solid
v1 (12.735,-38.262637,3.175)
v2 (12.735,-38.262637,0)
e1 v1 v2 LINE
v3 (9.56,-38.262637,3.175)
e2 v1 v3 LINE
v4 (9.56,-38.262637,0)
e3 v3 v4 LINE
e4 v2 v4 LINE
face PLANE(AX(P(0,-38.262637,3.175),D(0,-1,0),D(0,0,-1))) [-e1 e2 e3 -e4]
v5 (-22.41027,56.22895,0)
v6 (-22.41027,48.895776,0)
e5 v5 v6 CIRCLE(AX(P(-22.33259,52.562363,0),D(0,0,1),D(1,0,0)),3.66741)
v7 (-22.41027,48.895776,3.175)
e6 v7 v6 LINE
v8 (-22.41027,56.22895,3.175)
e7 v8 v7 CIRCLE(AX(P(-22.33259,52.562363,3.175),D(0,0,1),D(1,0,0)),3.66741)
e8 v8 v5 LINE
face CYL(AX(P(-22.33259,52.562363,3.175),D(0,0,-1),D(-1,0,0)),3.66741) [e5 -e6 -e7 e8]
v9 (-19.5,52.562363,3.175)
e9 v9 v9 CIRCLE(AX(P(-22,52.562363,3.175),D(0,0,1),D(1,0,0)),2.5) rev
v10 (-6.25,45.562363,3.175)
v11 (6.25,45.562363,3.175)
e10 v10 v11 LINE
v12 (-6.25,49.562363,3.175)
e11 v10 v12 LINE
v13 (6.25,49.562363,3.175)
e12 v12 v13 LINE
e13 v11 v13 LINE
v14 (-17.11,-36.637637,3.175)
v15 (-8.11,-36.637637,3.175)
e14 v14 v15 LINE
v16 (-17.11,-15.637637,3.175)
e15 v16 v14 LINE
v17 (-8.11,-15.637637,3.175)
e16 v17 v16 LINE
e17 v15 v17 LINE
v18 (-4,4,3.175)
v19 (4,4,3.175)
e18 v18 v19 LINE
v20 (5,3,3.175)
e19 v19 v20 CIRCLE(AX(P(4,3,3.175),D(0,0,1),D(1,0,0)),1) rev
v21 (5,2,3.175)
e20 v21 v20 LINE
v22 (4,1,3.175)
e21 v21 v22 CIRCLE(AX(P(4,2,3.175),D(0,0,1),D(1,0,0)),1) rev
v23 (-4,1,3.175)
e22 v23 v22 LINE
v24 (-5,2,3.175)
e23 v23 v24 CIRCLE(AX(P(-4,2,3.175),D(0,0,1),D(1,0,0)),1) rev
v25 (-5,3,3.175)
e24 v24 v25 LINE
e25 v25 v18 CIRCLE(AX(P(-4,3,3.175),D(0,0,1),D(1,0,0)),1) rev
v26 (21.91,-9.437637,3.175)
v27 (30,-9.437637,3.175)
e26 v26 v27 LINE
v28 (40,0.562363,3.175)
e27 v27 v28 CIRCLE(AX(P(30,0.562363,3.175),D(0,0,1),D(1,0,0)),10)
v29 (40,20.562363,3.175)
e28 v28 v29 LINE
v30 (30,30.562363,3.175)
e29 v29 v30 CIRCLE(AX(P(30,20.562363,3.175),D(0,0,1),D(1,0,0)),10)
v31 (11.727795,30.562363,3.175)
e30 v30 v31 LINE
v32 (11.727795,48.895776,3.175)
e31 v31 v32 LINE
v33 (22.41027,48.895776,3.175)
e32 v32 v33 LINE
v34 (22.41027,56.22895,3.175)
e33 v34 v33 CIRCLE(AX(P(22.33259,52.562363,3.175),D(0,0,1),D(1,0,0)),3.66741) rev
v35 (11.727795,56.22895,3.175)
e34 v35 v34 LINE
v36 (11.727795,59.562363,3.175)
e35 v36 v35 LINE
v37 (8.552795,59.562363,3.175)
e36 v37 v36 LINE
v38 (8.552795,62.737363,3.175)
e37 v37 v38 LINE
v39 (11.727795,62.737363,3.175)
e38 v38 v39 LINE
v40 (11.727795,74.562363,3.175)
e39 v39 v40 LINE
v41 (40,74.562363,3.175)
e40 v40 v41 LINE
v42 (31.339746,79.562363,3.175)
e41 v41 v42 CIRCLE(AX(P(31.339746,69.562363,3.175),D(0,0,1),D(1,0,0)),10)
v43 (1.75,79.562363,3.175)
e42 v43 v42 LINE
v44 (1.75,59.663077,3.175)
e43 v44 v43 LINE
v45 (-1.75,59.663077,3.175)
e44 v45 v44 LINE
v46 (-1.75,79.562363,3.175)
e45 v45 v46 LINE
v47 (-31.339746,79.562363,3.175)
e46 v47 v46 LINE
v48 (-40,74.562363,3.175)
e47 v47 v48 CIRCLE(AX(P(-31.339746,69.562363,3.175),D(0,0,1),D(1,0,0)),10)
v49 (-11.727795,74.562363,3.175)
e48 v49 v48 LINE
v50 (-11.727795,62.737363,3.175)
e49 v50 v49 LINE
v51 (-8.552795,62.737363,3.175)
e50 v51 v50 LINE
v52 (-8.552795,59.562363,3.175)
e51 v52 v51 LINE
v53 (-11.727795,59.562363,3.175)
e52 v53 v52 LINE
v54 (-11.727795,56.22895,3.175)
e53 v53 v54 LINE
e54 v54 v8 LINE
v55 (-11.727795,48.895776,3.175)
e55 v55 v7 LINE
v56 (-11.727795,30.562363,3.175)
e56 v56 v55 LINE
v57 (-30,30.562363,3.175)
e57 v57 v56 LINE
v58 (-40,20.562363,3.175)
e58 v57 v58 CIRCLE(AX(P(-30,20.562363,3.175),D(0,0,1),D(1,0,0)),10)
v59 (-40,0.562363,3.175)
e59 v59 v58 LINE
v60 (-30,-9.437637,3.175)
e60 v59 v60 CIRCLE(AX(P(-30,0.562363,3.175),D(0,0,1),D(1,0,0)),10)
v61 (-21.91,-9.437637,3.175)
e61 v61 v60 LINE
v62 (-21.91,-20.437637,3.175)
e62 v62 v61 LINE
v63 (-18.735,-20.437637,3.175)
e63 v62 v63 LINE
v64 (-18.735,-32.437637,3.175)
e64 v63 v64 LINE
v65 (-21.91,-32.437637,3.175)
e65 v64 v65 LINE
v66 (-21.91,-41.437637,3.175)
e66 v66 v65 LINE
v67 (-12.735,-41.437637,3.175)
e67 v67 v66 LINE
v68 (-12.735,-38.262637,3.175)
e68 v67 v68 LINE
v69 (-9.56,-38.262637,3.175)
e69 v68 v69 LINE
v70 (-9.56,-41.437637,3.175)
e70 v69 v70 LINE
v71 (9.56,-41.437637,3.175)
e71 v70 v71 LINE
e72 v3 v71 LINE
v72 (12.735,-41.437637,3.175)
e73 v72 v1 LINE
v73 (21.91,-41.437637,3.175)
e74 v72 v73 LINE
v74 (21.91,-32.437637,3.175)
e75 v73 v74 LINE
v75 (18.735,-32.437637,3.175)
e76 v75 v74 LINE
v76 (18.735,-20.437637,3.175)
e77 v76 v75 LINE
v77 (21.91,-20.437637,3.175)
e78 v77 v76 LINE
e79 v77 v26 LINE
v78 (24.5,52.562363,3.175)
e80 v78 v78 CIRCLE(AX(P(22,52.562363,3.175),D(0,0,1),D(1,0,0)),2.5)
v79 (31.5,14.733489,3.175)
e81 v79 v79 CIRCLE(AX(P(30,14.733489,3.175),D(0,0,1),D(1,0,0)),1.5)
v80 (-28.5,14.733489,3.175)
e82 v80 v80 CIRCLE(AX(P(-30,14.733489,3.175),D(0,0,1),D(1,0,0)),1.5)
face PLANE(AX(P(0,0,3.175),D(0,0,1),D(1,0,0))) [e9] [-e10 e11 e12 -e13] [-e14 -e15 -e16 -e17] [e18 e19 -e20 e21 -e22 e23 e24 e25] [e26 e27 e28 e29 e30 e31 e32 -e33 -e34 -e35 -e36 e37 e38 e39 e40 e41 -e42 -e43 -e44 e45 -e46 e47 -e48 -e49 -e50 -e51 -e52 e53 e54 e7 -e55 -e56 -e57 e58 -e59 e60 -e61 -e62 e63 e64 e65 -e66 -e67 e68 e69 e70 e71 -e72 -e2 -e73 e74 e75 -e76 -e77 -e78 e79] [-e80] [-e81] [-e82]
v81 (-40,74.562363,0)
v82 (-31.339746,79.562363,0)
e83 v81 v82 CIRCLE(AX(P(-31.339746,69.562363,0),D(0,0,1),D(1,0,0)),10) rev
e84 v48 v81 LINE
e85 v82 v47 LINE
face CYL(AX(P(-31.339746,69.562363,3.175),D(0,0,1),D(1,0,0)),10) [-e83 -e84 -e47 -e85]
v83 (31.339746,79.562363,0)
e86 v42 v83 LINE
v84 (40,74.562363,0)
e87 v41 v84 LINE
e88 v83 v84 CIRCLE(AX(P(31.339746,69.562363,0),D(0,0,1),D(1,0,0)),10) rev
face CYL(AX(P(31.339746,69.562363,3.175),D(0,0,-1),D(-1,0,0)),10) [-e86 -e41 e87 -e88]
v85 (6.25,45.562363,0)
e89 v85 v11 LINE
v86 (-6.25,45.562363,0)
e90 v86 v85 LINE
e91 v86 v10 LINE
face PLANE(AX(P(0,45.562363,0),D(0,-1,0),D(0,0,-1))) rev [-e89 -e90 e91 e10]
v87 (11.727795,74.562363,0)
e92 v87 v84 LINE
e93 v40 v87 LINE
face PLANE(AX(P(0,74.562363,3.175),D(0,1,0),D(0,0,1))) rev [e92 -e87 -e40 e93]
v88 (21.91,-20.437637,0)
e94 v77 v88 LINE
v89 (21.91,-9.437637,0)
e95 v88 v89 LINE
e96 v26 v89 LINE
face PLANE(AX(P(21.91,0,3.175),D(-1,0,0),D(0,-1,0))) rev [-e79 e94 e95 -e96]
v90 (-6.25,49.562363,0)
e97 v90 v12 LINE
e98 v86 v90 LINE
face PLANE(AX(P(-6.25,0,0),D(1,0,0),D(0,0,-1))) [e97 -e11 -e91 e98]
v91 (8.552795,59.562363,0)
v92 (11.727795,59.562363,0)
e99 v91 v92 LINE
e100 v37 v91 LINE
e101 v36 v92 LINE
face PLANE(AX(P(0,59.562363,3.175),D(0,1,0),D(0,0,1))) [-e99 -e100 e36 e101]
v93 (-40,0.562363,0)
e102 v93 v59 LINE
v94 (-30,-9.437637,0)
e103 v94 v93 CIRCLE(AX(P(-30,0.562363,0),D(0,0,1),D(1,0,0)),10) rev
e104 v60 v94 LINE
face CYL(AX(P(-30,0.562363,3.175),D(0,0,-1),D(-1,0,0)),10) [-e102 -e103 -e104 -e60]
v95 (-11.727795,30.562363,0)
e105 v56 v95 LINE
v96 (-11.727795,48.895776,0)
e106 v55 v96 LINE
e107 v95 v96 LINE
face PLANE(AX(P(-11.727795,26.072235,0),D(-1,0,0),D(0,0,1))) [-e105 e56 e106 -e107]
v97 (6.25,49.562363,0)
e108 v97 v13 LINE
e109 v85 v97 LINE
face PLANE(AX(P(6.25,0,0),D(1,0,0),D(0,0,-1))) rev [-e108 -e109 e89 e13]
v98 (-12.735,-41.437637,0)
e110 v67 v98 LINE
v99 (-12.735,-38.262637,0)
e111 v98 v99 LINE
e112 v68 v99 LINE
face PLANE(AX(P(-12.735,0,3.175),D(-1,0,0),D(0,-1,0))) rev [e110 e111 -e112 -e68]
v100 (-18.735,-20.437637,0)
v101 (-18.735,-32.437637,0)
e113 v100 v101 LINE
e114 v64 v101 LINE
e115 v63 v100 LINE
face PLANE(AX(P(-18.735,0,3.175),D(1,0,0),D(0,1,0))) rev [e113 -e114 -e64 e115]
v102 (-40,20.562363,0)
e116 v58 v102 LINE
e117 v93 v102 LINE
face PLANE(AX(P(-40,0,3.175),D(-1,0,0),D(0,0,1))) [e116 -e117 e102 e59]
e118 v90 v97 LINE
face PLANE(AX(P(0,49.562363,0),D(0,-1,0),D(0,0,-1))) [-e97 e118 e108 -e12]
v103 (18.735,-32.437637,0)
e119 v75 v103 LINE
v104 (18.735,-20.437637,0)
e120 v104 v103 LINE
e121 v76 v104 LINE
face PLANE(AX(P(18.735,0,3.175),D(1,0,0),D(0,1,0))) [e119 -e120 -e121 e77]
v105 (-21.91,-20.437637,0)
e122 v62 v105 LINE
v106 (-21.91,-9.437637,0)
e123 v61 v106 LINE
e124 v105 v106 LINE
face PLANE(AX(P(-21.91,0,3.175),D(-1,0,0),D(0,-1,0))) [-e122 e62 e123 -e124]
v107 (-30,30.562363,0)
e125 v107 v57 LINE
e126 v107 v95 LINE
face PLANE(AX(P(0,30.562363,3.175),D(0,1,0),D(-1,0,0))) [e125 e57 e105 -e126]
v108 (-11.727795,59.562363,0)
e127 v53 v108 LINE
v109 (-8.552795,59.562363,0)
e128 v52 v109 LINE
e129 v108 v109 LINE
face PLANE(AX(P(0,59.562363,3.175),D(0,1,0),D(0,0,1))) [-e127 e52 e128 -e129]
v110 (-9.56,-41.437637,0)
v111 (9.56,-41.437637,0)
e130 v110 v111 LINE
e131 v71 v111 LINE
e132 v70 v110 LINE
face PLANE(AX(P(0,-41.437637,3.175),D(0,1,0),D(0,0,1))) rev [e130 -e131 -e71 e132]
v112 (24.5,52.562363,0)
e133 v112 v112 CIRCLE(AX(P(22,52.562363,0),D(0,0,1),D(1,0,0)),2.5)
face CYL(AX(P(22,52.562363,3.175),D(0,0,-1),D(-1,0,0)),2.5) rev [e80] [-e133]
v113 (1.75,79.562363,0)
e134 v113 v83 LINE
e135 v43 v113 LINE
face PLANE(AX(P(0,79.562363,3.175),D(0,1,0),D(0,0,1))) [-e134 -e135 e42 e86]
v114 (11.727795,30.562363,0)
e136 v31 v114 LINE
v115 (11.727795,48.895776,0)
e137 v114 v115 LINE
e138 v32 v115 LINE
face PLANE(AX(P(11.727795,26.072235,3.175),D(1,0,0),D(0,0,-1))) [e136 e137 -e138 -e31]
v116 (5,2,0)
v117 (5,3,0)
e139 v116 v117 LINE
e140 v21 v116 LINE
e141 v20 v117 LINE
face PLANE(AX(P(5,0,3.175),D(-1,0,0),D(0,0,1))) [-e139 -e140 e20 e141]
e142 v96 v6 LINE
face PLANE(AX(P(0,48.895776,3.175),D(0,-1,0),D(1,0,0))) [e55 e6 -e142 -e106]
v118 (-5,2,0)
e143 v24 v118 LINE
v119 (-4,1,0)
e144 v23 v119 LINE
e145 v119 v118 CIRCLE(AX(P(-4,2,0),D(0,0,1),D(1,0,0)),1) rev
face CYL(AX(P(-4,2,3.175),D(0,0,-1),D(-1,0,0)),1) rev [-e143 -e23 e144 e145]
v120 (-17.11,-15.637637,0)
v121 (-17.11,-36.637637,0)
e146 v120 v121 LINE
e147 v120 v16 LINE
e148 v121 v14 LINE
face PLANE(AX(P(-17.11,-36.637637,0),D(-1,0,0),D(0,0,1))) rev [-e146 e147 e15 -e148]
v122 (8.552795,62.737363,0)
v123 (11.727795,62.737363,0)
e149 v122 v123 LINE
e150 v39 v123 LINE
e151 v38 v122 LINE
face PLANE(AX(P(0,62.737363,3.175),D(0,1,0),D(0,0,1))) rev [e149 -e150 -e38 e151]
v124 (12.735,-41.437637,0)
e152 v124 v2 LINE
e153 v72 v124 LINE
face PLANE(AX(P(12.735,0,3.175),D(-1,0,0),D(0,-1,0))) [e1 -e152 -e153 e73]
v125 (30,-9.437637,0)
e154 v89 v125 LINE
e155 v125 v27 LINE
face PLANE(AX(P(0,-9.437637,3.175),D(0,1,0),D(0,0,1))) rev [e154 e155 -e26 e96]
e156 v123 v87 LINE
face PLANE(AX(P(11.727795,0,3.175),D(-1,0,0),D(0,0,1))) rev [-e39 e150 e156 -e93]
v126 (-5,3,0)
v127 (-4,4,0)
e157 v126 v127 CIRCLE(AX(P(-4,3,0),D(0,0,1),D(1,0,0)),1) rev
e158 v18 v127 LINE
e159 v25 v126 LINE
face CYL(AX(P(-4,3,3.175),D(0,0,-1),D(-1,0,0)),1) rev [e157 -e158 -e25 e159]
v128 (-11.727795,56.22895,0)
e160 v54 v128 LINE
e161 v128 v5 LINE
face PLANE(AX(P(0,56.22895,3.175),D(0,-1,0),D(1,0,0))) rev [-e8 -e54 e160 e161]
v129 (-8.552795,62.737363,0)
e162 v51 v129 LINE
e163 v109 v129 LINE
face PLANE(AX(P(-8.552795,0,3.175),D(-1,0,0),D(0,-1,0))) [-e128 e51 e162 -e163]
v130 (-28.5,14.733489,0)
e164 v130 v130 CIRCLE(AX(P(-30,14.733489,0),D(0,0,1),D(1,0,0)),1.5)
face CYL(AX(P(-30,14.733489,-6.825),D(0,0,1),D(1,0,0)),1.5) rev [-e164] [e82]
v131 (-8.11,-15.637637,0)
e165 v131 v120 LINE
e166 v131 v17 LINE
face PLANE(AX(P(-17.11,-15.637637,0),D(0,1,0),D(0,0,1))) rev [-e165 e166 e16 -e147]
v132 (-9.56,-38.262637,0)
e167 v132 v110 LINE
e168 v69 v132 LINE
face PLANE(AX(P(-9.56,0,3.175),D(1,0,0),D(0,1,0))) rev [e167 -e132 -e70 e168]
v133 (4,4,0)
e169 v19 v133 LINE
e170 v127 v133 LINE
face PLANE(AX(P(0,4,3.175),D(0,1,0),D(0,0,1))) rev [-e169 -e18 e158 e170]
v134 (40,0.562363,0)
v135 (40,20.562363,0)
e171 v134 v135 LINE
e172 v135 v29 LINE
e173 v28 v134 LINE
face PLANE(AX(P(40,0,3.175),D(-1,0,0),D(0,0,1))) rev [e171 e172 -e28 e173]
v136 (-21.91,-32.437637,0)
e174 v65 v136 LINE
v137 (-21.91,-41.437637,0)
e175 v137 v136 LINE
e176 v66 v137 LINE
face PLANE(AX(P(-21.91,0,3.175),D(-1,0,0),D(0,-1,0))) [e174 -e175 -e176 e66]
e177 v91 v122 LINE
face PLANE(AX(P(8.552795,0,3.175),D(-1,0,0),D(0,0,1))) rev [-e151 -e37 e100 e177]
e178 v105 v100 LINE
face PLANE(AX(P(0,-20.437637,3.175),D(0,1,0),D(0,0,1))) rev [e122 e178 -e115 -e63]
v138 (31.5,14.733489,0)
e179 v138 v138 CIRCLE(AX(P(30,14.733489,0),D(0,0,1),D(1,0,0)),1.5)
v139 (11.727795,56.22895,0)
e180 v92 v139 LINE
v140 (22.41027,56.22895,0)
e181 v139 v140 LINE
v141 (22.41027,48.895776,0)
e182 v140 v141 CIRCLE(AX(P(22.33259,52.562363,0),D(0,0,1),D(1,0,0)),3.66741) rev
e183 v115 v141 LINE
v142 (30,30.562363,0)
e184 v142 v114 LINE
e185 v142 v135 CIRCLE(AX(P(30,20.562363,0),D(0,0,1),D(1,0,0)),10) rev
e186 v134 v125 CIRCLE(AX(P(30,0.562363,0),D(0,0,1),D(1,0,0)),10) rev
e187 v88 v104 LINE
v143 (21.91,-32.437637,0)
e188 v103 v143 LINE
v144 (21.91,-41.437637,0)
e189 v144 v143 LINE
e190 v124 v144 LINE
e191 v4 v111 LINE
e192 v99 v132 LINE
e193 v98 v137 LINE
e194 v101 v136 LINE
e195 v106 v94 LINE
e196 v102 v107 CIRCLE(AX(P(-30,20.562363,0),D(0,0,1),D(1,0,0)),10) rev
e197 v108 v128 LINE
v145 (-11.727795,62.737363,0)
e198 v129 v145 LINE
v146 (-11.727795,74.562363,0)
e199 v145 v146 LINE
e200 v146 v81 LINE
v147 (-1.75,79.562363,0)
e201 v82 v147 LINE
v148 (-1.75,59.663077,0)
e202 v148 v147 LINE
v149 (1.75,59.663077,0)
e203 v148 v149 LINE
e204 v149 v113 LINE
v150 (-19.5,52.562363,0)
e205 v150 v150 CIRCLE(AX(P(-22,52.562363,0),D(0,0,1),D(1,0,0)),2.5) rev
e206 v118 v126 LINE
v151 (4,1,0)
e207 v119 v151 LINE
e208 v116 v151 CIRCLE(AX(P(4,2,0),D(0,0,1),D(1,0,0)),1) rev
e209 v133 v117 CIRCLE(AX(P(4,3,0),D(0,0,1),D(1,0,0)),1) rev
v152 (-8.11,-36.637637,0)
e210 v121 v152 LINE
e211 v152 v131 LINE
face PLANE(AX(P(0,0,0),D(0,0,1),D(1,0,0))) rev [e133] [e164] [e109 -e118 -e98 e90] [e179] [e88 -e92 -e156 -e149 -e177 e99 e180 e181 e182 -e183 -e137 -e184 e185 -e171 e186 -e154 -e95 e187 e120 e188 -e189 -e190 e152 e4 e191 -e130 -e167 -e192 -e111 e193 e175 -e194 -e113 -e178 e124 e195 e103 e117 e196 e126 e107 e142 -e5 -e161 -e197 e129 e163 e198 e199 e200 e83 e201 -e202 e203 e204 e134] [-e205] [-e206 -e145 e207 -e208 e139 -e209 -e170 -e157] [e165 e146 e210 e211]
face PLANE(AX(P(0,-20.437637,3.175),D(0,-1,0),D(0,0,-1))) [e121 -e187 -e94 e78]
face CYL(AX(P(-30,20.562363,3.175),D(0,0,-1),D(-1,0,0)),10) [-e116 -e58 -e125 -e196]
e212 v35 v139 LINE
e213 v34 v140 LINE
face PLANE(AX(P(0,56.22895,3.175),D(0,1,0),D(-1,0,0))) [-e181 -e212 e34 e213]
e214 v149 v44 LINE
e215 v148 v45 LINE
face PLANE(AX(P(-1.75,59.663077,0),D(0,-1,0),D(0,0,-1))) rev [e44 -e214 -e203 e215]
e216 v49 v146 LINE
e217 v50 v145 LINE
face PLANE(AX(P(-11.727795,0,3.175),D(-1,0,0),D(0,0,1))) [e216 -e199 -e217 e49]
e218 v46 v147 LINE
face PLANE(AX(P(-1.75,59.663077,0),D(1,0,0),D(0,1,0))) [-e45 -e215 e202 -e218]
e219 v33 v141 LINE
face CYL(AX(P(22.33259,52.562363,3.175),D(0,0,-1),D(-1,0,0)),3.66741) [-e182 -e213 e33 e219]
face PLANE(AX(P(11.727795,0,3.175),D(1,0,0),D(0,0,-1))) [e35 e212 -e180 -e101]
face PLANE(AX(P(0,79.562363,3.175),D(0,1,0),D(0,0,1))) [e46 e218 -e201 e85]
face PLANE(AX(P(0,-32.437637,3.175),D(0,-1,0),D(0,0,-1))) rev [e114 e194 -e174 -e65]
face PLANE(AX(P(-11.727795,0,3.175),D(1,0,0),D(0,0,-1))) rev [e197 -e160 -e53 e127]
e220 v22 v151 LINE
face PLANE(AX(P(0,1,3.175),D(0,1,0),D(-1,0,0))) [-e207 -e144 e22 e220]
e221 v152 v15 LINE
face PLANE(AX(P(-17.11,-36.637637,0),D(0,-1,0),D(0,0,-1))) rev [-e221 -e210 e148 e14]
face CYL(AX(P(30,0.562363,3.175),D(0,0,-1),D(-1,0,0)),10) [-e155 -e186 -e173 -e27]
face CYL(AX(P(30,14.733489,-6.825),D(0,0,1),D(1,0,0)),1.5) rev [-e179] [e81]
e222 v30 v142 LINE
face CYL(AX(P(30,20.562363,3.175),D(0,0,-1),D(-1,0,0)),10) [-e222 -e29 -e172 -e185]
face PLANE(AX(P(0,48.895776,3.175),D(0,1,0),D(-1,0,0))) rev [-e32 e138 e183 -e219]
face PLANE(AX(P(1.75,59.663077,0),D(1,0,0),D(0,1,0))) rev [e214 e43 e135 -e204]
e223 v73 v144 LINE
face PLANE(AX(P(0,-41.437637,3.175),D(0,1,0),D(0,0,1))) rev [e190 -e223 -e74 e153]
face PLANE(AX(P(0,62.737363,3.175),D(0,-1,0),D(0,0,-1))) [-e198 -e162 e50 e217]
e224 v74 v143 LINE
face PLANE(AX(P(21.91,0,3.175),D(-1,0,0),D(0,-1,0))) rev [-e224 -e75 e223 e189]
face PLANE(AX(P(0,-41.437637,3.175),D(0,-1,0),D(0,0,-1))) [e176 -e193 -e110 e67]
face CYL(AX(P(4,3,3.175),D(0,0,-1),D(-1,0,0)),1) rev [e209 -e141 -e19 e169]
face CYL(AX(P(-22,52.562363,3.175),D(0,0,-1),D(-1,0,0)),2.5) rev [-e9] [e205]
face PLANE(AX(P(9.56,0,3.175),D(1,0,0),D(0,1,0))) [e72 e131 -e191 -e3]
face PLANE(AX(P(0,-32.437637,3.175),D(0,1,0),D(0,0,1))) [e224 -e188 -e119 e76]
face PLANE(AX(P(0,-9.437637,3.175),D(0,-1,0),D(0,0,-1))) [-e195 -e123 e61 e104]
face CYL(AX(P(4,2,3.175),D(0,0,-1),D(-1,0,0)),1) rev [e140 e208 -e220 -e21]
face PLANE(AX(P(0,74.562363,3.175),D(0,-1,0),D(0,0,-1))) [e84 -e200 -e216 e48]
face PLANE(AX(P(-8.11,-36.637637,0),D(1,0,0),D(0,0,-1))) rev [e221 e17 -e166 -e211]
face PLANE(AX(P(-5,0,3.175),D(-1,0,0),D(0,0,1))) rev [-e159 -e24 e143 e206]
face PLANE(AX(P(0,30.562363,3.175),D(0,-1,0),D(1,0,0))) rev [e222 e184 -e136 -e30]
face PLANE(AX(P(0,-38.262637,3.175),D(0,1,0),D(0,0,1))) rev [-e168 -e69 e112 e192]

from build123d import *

# Parameters (mm, degrees)
SKETCH1_R           = 2.5
BOSS_EXTRUDE1_DEPTH = 3.175
FILLET1_R           = 10
SKETCH2_W           = 9
SKETCH2_H           = 21
CUT_EXTRUDE1_DEPTH  = 90.108082017
SKETCH3_W           = 12.5
SKETCH3_H           = 4
SKETCH3_W_2         = 3.5
SKETCH3_H_2         = 20
CUT_EXTRUDE2_DEPTH  = 90.108082017
FILLET2_R           = 10
SKETCH4_W           = 3.175
SKETCH4_H           = 3.175
BOSS_EXTRUDE2_DEPTH = 29
SKETCH5_W           = 3.175
SKETCH5_H           = 3.175
BOSS_EXTRUDE3_DEPTH = 29
SKETCH7_R           = 1.5
CUT_EXTRUDE3_DEPTH  = 10


with BuildPart() as part:
    # Sketch1 → Boss-Extrude1 (new body)
    with BuildSketch(Plane.XY):
        with BuildLine():
            Line((-9.56, -38.262636689), (-9.56, -41.437636689))
            Line((-9.56, -41.437636689), (9.56, -41.437636689))
            Line((9.56, -41.437636689), (9.56, -38.262636689))
            Line((9.56, -38.262636689), (12.735, -38.262636689))
            Line((12.735, -38.262636689), (12.735, -41.437636689))
            Line((12.735, -41.437636689), (15.91, -41.437636689))
            Line((15.91, -41.437636689), (21.91, -41.437636689))
            Line((21.91, -41.437636689), (21.91, -32.437636689))
            Line((21.91, -32.437636689), (18.735, -32.437636689))
            Line((18.735, -32.437636689), (18.735, -20.437636689))
            Line((18.735, -20.437636689), (21.91, -20.437636689))
            Line((21.91, -20.437636689), (21.91, -9.437636689))
            Line((21.91, -9.437636689), (40, -9.437636689))
            Line((40, -9.437636689), (40, 30.562363311))
            Line((40, 30.562363311), (10, 30.562363311))
            Line((10, 30.562363311), (10, 45.562363311))
            Line((10, 45.562363311), (10, 48.89577614))
            Line((10, 48.89577614), (22.410269523, 48.89577614))
            ThreePointArc((22.410269523, 48.89577614), (26.000000001, 52.562363311), (22.410269523, 56.228950483))
            Line((22.410269523, 56.228950483), (11.727794547, 56.228950483))
            Line((11.727794547, 56.228950483), (11.727794547, 59.562363311))
            Line((11.727794547, 59.562363311), (10, 59.562363311))
            Line((10, 59.562363311), (8.552794547, 59.562363311))
            Line((8.552794547, 59.562363311), (8.552794547, 62.737363311))
            Line((8.552794547, 62.737363311), (11.727794547, 62.737363311))
            Line((11.727794547, 62.737363311), (11.727794547, 74.562363311))
            Line((11.727794547, 74.562363311), (40, 74.562363311))
            Line((40, 74.562363311), (40, 79.562363311))
            Line((40, 79.562363311), (0, 79.562363311))
            Line((0, 79.562363311), (-40, 79.562363311))
            Line((-40, 79.562363311), (-40, 74.562363311))
            Line((-40, 74.562363311), (-11.727794547, 74.562363311))
            Line((-11.727794547, 74.562363311), (-11.727794547, 62.737363311))
            Line((-11.727794547, 62.737363311), (-8.552794547, 62.737363311))
            Line((-8.552794547, 62.737363311), (-8.552794547, 59.562363311))
            Line((-8.552794547, 59.562363311), (-10, 59.562363311))
            Line((-10, 59.562363311), (-11.727794547, 59.562363311))
            Line((-11.727794547, 59.562363311), (-11.727794547, 56.228950483))
            Line((-11.727794547, 56.228950483), (-22.410269523, 56.228950483))
            ThreePointArc((-22.410269523, 56.228950483), (-26.000000001, 52.562363311), (-22.410269523, 48.89577614))
            Line((-22.410269523, 48.89577614), (-10, 48.89577614))
            Line((-10, 48.89577614), (-10, 45.562363311))
            Line((-10, 45.562363311), (-10, 30.562363311))
            Line((-10, 30.562363311), (-40, 30.562363311))
            Line((-40, 30.562363311), (-40, -9.437636689))
            Line((-40, -9.437636689), (-21.91, -9.437636689))
            Line((-21.91, -9.437636689), (-21.91, -20.437636689))
            Line((-21.91, -20.437636689), (-18.735, -20.437636689))
            Line((-18.735, -20.437636689), (-18.735, -32.437636689))
            Line((-18.735, -32.437636689), (-21.91, -32.437636689))
            Line((-21.91, -32.437636689), (-21.91, -41.437636689))
            Line((-21.91, -41.437636689), (-15.91, -41.437636689))
            Line((-15.91, -41.437636689), (-12.735, -41.437636689))
            Line((-12.735, -41.437636689), (-12.735, -38.262636689))
            Line((-12.735, -38.262636689), (-9.56, -38.262636689))
        make_face()
        with BuildLine():
            Line((4, 1), (-4, 1))
            ThreePointArc((-4, 1), (-4.707106781, 1.292893219), (-5, 2))
            Line((-5, 2), (-5, 3))
            ThreePointArc((-5, 3), (-4.707106781, 3.707106781), (-4, 4))
            Line((-4, 4), (4, 4))
            ThreePointArc((4, 4), (4.707106781, 3.707106781), (5, 3))
            Line((5, 3), (5, 2))
            ThreePointArc((5, 2), (4.707106781, 1.292893219), (4, 1))
        make_face(mode=Mode.SUBTRACT)
        with Locations((-22, 52.562363311)):
            Circle(SKETCH1_R, mode=Mode.SUBTRACT)
        with Locations((22, 52.562363311)):
            Circle(SKETCH1_R, mode=Mode.SUBTRACT)
    extrude(amount=BOSS_EXTRUDE1_DEPTH)

    # Fillet1
    # the kernel refuses this fillet: 10 mm, written as the material it takes off along each edge
    with BuildSketch(Plane(origin=(-40, 79.562363311, -21.650635095), x_dir=(0, -1, 0), z_dir=(0, 0, 1))) as fillet1_piece_1:
        with BuildLine():
            CenterArc((10, 8.660254038), FILLET1_R, 180, 60)
            Line((0, 8.660254038), (-0.2, 8.660254038))
            Line((-0.2, 8.660254038), (-0.2, 0))
            Line((-0.2, 0), (0, -0.2))
            ThreePointArc((0, -0.2), (2.5, -0.2), (4.9, -0.173205081))
            Line((4.9, -0.173205081), (5, 0))
        make_face()
    extrude(amount=46.476270189, mode=Mode.SUBTRACT)
    with BuildSketch(Plane(origin=(40, 79.562363311, -21.650635095), x_dir=(-1, 0, 0), z_dir=(0, 0, 1))) as fillet1_piece_2:
        with BuildLine():
            CenterArc((8.660254038, 10), FILLET1_R, 210, 60)
            Line((0, 5), (-0.173205081, 4.9))
            ThreePointArc((-0.173205081, 4.9), (-0.2, 2.5), (-0.2, 0))
            Line((-0.2, 0), (0, -0.2))
            Line((0, -0.2), (8.660254038, -0.2))
            Line((8.660254038, -0.2), (8.660254038, 0))
        make_face()
    extrude(amount=46.476270189, mode=Mode.SUBTRACT)

    # Sketch2 → Cut-Extrude1 (cut, through all)
    with BuildSketch(Plane.XY.offset(3.175)):
        with Locations((-12.61, -26.137636689)):
            Rectangle(SKETCH2_W, SKETCH2_H)
    extrude(amount=-CUT_EXTRUDE1_DEPTH, mode=Mode.SUBTRACT)

    # Sketch3 → Cut-Extrude2 (cut, through all)
    with BuildSketch(Plane.XY.offset(3.175)):
        with Locations((0, 47.562363311)):
            Rectangle(SKETCH3_W, SKETCH3_H)
        with Locations((0, 69.663077344)):
            Rectangle(SKETCH3_W_2, SKETCH3_H_2)
    extrude(amount=-CUT_EXTRUDE2_DEPTH, mode=Mode.SUBTRACT)

    # Fillet2
    fillet2_edges = [part.edges().sort_by_distance(p)[0] for p in [
        (40, 30.562363311, 1.5875),
        (40, -9.437636689, 1.5875),
        (-40, -9.437636689, 1.5875),
        (-40, 30.562363311, 1.5875),
    ]]
    fillet(fillet2_edges, radius=FILLET2_R)

    # Sketch4 → Boss-Extrude2 (add)
    with BuildSketch(Plane(origin=(0, 59.562363311, 0), x_dir=(1, 0, 0), z_dir=(0, 1, 0))):
        with Locations((10.140294547, -1.5875)):
            Rectangle(SKETCH4_W, SKETCH4_H)
    extrude(amount=-BOSS_EXTRUDE2_DEPTH)

    # Sketch5 → Boss-Extrude3 (add)
    with BuildSketch(Plane(origin=(0, 59.562363311, 0), x_dir=(1, 0, 0), z_dir=(0, 1, 0))):
        with Locations((-10.140294547, -1.5875)):
            Rectangle(SKETCH5_W, SKETCH5_H)
    extrude(amount=-BOSS_EXTRUDE3_DEPTH)

    # Sketch7 → Cut-Extrude3 (cut)
    with BuildSketch(Plane.XY.offset(3.175)):
        with Locations((-30, 14.733489054)):
            Circle(SKETCH7_R)
        with Locations((30, 14.733489054)):
            Circle(SKETCH7_R)
    extrude(amount=-CUT_EXTRUDE3_DEPTH, mode=Mode.SUBTRACT)


solid = part.part
